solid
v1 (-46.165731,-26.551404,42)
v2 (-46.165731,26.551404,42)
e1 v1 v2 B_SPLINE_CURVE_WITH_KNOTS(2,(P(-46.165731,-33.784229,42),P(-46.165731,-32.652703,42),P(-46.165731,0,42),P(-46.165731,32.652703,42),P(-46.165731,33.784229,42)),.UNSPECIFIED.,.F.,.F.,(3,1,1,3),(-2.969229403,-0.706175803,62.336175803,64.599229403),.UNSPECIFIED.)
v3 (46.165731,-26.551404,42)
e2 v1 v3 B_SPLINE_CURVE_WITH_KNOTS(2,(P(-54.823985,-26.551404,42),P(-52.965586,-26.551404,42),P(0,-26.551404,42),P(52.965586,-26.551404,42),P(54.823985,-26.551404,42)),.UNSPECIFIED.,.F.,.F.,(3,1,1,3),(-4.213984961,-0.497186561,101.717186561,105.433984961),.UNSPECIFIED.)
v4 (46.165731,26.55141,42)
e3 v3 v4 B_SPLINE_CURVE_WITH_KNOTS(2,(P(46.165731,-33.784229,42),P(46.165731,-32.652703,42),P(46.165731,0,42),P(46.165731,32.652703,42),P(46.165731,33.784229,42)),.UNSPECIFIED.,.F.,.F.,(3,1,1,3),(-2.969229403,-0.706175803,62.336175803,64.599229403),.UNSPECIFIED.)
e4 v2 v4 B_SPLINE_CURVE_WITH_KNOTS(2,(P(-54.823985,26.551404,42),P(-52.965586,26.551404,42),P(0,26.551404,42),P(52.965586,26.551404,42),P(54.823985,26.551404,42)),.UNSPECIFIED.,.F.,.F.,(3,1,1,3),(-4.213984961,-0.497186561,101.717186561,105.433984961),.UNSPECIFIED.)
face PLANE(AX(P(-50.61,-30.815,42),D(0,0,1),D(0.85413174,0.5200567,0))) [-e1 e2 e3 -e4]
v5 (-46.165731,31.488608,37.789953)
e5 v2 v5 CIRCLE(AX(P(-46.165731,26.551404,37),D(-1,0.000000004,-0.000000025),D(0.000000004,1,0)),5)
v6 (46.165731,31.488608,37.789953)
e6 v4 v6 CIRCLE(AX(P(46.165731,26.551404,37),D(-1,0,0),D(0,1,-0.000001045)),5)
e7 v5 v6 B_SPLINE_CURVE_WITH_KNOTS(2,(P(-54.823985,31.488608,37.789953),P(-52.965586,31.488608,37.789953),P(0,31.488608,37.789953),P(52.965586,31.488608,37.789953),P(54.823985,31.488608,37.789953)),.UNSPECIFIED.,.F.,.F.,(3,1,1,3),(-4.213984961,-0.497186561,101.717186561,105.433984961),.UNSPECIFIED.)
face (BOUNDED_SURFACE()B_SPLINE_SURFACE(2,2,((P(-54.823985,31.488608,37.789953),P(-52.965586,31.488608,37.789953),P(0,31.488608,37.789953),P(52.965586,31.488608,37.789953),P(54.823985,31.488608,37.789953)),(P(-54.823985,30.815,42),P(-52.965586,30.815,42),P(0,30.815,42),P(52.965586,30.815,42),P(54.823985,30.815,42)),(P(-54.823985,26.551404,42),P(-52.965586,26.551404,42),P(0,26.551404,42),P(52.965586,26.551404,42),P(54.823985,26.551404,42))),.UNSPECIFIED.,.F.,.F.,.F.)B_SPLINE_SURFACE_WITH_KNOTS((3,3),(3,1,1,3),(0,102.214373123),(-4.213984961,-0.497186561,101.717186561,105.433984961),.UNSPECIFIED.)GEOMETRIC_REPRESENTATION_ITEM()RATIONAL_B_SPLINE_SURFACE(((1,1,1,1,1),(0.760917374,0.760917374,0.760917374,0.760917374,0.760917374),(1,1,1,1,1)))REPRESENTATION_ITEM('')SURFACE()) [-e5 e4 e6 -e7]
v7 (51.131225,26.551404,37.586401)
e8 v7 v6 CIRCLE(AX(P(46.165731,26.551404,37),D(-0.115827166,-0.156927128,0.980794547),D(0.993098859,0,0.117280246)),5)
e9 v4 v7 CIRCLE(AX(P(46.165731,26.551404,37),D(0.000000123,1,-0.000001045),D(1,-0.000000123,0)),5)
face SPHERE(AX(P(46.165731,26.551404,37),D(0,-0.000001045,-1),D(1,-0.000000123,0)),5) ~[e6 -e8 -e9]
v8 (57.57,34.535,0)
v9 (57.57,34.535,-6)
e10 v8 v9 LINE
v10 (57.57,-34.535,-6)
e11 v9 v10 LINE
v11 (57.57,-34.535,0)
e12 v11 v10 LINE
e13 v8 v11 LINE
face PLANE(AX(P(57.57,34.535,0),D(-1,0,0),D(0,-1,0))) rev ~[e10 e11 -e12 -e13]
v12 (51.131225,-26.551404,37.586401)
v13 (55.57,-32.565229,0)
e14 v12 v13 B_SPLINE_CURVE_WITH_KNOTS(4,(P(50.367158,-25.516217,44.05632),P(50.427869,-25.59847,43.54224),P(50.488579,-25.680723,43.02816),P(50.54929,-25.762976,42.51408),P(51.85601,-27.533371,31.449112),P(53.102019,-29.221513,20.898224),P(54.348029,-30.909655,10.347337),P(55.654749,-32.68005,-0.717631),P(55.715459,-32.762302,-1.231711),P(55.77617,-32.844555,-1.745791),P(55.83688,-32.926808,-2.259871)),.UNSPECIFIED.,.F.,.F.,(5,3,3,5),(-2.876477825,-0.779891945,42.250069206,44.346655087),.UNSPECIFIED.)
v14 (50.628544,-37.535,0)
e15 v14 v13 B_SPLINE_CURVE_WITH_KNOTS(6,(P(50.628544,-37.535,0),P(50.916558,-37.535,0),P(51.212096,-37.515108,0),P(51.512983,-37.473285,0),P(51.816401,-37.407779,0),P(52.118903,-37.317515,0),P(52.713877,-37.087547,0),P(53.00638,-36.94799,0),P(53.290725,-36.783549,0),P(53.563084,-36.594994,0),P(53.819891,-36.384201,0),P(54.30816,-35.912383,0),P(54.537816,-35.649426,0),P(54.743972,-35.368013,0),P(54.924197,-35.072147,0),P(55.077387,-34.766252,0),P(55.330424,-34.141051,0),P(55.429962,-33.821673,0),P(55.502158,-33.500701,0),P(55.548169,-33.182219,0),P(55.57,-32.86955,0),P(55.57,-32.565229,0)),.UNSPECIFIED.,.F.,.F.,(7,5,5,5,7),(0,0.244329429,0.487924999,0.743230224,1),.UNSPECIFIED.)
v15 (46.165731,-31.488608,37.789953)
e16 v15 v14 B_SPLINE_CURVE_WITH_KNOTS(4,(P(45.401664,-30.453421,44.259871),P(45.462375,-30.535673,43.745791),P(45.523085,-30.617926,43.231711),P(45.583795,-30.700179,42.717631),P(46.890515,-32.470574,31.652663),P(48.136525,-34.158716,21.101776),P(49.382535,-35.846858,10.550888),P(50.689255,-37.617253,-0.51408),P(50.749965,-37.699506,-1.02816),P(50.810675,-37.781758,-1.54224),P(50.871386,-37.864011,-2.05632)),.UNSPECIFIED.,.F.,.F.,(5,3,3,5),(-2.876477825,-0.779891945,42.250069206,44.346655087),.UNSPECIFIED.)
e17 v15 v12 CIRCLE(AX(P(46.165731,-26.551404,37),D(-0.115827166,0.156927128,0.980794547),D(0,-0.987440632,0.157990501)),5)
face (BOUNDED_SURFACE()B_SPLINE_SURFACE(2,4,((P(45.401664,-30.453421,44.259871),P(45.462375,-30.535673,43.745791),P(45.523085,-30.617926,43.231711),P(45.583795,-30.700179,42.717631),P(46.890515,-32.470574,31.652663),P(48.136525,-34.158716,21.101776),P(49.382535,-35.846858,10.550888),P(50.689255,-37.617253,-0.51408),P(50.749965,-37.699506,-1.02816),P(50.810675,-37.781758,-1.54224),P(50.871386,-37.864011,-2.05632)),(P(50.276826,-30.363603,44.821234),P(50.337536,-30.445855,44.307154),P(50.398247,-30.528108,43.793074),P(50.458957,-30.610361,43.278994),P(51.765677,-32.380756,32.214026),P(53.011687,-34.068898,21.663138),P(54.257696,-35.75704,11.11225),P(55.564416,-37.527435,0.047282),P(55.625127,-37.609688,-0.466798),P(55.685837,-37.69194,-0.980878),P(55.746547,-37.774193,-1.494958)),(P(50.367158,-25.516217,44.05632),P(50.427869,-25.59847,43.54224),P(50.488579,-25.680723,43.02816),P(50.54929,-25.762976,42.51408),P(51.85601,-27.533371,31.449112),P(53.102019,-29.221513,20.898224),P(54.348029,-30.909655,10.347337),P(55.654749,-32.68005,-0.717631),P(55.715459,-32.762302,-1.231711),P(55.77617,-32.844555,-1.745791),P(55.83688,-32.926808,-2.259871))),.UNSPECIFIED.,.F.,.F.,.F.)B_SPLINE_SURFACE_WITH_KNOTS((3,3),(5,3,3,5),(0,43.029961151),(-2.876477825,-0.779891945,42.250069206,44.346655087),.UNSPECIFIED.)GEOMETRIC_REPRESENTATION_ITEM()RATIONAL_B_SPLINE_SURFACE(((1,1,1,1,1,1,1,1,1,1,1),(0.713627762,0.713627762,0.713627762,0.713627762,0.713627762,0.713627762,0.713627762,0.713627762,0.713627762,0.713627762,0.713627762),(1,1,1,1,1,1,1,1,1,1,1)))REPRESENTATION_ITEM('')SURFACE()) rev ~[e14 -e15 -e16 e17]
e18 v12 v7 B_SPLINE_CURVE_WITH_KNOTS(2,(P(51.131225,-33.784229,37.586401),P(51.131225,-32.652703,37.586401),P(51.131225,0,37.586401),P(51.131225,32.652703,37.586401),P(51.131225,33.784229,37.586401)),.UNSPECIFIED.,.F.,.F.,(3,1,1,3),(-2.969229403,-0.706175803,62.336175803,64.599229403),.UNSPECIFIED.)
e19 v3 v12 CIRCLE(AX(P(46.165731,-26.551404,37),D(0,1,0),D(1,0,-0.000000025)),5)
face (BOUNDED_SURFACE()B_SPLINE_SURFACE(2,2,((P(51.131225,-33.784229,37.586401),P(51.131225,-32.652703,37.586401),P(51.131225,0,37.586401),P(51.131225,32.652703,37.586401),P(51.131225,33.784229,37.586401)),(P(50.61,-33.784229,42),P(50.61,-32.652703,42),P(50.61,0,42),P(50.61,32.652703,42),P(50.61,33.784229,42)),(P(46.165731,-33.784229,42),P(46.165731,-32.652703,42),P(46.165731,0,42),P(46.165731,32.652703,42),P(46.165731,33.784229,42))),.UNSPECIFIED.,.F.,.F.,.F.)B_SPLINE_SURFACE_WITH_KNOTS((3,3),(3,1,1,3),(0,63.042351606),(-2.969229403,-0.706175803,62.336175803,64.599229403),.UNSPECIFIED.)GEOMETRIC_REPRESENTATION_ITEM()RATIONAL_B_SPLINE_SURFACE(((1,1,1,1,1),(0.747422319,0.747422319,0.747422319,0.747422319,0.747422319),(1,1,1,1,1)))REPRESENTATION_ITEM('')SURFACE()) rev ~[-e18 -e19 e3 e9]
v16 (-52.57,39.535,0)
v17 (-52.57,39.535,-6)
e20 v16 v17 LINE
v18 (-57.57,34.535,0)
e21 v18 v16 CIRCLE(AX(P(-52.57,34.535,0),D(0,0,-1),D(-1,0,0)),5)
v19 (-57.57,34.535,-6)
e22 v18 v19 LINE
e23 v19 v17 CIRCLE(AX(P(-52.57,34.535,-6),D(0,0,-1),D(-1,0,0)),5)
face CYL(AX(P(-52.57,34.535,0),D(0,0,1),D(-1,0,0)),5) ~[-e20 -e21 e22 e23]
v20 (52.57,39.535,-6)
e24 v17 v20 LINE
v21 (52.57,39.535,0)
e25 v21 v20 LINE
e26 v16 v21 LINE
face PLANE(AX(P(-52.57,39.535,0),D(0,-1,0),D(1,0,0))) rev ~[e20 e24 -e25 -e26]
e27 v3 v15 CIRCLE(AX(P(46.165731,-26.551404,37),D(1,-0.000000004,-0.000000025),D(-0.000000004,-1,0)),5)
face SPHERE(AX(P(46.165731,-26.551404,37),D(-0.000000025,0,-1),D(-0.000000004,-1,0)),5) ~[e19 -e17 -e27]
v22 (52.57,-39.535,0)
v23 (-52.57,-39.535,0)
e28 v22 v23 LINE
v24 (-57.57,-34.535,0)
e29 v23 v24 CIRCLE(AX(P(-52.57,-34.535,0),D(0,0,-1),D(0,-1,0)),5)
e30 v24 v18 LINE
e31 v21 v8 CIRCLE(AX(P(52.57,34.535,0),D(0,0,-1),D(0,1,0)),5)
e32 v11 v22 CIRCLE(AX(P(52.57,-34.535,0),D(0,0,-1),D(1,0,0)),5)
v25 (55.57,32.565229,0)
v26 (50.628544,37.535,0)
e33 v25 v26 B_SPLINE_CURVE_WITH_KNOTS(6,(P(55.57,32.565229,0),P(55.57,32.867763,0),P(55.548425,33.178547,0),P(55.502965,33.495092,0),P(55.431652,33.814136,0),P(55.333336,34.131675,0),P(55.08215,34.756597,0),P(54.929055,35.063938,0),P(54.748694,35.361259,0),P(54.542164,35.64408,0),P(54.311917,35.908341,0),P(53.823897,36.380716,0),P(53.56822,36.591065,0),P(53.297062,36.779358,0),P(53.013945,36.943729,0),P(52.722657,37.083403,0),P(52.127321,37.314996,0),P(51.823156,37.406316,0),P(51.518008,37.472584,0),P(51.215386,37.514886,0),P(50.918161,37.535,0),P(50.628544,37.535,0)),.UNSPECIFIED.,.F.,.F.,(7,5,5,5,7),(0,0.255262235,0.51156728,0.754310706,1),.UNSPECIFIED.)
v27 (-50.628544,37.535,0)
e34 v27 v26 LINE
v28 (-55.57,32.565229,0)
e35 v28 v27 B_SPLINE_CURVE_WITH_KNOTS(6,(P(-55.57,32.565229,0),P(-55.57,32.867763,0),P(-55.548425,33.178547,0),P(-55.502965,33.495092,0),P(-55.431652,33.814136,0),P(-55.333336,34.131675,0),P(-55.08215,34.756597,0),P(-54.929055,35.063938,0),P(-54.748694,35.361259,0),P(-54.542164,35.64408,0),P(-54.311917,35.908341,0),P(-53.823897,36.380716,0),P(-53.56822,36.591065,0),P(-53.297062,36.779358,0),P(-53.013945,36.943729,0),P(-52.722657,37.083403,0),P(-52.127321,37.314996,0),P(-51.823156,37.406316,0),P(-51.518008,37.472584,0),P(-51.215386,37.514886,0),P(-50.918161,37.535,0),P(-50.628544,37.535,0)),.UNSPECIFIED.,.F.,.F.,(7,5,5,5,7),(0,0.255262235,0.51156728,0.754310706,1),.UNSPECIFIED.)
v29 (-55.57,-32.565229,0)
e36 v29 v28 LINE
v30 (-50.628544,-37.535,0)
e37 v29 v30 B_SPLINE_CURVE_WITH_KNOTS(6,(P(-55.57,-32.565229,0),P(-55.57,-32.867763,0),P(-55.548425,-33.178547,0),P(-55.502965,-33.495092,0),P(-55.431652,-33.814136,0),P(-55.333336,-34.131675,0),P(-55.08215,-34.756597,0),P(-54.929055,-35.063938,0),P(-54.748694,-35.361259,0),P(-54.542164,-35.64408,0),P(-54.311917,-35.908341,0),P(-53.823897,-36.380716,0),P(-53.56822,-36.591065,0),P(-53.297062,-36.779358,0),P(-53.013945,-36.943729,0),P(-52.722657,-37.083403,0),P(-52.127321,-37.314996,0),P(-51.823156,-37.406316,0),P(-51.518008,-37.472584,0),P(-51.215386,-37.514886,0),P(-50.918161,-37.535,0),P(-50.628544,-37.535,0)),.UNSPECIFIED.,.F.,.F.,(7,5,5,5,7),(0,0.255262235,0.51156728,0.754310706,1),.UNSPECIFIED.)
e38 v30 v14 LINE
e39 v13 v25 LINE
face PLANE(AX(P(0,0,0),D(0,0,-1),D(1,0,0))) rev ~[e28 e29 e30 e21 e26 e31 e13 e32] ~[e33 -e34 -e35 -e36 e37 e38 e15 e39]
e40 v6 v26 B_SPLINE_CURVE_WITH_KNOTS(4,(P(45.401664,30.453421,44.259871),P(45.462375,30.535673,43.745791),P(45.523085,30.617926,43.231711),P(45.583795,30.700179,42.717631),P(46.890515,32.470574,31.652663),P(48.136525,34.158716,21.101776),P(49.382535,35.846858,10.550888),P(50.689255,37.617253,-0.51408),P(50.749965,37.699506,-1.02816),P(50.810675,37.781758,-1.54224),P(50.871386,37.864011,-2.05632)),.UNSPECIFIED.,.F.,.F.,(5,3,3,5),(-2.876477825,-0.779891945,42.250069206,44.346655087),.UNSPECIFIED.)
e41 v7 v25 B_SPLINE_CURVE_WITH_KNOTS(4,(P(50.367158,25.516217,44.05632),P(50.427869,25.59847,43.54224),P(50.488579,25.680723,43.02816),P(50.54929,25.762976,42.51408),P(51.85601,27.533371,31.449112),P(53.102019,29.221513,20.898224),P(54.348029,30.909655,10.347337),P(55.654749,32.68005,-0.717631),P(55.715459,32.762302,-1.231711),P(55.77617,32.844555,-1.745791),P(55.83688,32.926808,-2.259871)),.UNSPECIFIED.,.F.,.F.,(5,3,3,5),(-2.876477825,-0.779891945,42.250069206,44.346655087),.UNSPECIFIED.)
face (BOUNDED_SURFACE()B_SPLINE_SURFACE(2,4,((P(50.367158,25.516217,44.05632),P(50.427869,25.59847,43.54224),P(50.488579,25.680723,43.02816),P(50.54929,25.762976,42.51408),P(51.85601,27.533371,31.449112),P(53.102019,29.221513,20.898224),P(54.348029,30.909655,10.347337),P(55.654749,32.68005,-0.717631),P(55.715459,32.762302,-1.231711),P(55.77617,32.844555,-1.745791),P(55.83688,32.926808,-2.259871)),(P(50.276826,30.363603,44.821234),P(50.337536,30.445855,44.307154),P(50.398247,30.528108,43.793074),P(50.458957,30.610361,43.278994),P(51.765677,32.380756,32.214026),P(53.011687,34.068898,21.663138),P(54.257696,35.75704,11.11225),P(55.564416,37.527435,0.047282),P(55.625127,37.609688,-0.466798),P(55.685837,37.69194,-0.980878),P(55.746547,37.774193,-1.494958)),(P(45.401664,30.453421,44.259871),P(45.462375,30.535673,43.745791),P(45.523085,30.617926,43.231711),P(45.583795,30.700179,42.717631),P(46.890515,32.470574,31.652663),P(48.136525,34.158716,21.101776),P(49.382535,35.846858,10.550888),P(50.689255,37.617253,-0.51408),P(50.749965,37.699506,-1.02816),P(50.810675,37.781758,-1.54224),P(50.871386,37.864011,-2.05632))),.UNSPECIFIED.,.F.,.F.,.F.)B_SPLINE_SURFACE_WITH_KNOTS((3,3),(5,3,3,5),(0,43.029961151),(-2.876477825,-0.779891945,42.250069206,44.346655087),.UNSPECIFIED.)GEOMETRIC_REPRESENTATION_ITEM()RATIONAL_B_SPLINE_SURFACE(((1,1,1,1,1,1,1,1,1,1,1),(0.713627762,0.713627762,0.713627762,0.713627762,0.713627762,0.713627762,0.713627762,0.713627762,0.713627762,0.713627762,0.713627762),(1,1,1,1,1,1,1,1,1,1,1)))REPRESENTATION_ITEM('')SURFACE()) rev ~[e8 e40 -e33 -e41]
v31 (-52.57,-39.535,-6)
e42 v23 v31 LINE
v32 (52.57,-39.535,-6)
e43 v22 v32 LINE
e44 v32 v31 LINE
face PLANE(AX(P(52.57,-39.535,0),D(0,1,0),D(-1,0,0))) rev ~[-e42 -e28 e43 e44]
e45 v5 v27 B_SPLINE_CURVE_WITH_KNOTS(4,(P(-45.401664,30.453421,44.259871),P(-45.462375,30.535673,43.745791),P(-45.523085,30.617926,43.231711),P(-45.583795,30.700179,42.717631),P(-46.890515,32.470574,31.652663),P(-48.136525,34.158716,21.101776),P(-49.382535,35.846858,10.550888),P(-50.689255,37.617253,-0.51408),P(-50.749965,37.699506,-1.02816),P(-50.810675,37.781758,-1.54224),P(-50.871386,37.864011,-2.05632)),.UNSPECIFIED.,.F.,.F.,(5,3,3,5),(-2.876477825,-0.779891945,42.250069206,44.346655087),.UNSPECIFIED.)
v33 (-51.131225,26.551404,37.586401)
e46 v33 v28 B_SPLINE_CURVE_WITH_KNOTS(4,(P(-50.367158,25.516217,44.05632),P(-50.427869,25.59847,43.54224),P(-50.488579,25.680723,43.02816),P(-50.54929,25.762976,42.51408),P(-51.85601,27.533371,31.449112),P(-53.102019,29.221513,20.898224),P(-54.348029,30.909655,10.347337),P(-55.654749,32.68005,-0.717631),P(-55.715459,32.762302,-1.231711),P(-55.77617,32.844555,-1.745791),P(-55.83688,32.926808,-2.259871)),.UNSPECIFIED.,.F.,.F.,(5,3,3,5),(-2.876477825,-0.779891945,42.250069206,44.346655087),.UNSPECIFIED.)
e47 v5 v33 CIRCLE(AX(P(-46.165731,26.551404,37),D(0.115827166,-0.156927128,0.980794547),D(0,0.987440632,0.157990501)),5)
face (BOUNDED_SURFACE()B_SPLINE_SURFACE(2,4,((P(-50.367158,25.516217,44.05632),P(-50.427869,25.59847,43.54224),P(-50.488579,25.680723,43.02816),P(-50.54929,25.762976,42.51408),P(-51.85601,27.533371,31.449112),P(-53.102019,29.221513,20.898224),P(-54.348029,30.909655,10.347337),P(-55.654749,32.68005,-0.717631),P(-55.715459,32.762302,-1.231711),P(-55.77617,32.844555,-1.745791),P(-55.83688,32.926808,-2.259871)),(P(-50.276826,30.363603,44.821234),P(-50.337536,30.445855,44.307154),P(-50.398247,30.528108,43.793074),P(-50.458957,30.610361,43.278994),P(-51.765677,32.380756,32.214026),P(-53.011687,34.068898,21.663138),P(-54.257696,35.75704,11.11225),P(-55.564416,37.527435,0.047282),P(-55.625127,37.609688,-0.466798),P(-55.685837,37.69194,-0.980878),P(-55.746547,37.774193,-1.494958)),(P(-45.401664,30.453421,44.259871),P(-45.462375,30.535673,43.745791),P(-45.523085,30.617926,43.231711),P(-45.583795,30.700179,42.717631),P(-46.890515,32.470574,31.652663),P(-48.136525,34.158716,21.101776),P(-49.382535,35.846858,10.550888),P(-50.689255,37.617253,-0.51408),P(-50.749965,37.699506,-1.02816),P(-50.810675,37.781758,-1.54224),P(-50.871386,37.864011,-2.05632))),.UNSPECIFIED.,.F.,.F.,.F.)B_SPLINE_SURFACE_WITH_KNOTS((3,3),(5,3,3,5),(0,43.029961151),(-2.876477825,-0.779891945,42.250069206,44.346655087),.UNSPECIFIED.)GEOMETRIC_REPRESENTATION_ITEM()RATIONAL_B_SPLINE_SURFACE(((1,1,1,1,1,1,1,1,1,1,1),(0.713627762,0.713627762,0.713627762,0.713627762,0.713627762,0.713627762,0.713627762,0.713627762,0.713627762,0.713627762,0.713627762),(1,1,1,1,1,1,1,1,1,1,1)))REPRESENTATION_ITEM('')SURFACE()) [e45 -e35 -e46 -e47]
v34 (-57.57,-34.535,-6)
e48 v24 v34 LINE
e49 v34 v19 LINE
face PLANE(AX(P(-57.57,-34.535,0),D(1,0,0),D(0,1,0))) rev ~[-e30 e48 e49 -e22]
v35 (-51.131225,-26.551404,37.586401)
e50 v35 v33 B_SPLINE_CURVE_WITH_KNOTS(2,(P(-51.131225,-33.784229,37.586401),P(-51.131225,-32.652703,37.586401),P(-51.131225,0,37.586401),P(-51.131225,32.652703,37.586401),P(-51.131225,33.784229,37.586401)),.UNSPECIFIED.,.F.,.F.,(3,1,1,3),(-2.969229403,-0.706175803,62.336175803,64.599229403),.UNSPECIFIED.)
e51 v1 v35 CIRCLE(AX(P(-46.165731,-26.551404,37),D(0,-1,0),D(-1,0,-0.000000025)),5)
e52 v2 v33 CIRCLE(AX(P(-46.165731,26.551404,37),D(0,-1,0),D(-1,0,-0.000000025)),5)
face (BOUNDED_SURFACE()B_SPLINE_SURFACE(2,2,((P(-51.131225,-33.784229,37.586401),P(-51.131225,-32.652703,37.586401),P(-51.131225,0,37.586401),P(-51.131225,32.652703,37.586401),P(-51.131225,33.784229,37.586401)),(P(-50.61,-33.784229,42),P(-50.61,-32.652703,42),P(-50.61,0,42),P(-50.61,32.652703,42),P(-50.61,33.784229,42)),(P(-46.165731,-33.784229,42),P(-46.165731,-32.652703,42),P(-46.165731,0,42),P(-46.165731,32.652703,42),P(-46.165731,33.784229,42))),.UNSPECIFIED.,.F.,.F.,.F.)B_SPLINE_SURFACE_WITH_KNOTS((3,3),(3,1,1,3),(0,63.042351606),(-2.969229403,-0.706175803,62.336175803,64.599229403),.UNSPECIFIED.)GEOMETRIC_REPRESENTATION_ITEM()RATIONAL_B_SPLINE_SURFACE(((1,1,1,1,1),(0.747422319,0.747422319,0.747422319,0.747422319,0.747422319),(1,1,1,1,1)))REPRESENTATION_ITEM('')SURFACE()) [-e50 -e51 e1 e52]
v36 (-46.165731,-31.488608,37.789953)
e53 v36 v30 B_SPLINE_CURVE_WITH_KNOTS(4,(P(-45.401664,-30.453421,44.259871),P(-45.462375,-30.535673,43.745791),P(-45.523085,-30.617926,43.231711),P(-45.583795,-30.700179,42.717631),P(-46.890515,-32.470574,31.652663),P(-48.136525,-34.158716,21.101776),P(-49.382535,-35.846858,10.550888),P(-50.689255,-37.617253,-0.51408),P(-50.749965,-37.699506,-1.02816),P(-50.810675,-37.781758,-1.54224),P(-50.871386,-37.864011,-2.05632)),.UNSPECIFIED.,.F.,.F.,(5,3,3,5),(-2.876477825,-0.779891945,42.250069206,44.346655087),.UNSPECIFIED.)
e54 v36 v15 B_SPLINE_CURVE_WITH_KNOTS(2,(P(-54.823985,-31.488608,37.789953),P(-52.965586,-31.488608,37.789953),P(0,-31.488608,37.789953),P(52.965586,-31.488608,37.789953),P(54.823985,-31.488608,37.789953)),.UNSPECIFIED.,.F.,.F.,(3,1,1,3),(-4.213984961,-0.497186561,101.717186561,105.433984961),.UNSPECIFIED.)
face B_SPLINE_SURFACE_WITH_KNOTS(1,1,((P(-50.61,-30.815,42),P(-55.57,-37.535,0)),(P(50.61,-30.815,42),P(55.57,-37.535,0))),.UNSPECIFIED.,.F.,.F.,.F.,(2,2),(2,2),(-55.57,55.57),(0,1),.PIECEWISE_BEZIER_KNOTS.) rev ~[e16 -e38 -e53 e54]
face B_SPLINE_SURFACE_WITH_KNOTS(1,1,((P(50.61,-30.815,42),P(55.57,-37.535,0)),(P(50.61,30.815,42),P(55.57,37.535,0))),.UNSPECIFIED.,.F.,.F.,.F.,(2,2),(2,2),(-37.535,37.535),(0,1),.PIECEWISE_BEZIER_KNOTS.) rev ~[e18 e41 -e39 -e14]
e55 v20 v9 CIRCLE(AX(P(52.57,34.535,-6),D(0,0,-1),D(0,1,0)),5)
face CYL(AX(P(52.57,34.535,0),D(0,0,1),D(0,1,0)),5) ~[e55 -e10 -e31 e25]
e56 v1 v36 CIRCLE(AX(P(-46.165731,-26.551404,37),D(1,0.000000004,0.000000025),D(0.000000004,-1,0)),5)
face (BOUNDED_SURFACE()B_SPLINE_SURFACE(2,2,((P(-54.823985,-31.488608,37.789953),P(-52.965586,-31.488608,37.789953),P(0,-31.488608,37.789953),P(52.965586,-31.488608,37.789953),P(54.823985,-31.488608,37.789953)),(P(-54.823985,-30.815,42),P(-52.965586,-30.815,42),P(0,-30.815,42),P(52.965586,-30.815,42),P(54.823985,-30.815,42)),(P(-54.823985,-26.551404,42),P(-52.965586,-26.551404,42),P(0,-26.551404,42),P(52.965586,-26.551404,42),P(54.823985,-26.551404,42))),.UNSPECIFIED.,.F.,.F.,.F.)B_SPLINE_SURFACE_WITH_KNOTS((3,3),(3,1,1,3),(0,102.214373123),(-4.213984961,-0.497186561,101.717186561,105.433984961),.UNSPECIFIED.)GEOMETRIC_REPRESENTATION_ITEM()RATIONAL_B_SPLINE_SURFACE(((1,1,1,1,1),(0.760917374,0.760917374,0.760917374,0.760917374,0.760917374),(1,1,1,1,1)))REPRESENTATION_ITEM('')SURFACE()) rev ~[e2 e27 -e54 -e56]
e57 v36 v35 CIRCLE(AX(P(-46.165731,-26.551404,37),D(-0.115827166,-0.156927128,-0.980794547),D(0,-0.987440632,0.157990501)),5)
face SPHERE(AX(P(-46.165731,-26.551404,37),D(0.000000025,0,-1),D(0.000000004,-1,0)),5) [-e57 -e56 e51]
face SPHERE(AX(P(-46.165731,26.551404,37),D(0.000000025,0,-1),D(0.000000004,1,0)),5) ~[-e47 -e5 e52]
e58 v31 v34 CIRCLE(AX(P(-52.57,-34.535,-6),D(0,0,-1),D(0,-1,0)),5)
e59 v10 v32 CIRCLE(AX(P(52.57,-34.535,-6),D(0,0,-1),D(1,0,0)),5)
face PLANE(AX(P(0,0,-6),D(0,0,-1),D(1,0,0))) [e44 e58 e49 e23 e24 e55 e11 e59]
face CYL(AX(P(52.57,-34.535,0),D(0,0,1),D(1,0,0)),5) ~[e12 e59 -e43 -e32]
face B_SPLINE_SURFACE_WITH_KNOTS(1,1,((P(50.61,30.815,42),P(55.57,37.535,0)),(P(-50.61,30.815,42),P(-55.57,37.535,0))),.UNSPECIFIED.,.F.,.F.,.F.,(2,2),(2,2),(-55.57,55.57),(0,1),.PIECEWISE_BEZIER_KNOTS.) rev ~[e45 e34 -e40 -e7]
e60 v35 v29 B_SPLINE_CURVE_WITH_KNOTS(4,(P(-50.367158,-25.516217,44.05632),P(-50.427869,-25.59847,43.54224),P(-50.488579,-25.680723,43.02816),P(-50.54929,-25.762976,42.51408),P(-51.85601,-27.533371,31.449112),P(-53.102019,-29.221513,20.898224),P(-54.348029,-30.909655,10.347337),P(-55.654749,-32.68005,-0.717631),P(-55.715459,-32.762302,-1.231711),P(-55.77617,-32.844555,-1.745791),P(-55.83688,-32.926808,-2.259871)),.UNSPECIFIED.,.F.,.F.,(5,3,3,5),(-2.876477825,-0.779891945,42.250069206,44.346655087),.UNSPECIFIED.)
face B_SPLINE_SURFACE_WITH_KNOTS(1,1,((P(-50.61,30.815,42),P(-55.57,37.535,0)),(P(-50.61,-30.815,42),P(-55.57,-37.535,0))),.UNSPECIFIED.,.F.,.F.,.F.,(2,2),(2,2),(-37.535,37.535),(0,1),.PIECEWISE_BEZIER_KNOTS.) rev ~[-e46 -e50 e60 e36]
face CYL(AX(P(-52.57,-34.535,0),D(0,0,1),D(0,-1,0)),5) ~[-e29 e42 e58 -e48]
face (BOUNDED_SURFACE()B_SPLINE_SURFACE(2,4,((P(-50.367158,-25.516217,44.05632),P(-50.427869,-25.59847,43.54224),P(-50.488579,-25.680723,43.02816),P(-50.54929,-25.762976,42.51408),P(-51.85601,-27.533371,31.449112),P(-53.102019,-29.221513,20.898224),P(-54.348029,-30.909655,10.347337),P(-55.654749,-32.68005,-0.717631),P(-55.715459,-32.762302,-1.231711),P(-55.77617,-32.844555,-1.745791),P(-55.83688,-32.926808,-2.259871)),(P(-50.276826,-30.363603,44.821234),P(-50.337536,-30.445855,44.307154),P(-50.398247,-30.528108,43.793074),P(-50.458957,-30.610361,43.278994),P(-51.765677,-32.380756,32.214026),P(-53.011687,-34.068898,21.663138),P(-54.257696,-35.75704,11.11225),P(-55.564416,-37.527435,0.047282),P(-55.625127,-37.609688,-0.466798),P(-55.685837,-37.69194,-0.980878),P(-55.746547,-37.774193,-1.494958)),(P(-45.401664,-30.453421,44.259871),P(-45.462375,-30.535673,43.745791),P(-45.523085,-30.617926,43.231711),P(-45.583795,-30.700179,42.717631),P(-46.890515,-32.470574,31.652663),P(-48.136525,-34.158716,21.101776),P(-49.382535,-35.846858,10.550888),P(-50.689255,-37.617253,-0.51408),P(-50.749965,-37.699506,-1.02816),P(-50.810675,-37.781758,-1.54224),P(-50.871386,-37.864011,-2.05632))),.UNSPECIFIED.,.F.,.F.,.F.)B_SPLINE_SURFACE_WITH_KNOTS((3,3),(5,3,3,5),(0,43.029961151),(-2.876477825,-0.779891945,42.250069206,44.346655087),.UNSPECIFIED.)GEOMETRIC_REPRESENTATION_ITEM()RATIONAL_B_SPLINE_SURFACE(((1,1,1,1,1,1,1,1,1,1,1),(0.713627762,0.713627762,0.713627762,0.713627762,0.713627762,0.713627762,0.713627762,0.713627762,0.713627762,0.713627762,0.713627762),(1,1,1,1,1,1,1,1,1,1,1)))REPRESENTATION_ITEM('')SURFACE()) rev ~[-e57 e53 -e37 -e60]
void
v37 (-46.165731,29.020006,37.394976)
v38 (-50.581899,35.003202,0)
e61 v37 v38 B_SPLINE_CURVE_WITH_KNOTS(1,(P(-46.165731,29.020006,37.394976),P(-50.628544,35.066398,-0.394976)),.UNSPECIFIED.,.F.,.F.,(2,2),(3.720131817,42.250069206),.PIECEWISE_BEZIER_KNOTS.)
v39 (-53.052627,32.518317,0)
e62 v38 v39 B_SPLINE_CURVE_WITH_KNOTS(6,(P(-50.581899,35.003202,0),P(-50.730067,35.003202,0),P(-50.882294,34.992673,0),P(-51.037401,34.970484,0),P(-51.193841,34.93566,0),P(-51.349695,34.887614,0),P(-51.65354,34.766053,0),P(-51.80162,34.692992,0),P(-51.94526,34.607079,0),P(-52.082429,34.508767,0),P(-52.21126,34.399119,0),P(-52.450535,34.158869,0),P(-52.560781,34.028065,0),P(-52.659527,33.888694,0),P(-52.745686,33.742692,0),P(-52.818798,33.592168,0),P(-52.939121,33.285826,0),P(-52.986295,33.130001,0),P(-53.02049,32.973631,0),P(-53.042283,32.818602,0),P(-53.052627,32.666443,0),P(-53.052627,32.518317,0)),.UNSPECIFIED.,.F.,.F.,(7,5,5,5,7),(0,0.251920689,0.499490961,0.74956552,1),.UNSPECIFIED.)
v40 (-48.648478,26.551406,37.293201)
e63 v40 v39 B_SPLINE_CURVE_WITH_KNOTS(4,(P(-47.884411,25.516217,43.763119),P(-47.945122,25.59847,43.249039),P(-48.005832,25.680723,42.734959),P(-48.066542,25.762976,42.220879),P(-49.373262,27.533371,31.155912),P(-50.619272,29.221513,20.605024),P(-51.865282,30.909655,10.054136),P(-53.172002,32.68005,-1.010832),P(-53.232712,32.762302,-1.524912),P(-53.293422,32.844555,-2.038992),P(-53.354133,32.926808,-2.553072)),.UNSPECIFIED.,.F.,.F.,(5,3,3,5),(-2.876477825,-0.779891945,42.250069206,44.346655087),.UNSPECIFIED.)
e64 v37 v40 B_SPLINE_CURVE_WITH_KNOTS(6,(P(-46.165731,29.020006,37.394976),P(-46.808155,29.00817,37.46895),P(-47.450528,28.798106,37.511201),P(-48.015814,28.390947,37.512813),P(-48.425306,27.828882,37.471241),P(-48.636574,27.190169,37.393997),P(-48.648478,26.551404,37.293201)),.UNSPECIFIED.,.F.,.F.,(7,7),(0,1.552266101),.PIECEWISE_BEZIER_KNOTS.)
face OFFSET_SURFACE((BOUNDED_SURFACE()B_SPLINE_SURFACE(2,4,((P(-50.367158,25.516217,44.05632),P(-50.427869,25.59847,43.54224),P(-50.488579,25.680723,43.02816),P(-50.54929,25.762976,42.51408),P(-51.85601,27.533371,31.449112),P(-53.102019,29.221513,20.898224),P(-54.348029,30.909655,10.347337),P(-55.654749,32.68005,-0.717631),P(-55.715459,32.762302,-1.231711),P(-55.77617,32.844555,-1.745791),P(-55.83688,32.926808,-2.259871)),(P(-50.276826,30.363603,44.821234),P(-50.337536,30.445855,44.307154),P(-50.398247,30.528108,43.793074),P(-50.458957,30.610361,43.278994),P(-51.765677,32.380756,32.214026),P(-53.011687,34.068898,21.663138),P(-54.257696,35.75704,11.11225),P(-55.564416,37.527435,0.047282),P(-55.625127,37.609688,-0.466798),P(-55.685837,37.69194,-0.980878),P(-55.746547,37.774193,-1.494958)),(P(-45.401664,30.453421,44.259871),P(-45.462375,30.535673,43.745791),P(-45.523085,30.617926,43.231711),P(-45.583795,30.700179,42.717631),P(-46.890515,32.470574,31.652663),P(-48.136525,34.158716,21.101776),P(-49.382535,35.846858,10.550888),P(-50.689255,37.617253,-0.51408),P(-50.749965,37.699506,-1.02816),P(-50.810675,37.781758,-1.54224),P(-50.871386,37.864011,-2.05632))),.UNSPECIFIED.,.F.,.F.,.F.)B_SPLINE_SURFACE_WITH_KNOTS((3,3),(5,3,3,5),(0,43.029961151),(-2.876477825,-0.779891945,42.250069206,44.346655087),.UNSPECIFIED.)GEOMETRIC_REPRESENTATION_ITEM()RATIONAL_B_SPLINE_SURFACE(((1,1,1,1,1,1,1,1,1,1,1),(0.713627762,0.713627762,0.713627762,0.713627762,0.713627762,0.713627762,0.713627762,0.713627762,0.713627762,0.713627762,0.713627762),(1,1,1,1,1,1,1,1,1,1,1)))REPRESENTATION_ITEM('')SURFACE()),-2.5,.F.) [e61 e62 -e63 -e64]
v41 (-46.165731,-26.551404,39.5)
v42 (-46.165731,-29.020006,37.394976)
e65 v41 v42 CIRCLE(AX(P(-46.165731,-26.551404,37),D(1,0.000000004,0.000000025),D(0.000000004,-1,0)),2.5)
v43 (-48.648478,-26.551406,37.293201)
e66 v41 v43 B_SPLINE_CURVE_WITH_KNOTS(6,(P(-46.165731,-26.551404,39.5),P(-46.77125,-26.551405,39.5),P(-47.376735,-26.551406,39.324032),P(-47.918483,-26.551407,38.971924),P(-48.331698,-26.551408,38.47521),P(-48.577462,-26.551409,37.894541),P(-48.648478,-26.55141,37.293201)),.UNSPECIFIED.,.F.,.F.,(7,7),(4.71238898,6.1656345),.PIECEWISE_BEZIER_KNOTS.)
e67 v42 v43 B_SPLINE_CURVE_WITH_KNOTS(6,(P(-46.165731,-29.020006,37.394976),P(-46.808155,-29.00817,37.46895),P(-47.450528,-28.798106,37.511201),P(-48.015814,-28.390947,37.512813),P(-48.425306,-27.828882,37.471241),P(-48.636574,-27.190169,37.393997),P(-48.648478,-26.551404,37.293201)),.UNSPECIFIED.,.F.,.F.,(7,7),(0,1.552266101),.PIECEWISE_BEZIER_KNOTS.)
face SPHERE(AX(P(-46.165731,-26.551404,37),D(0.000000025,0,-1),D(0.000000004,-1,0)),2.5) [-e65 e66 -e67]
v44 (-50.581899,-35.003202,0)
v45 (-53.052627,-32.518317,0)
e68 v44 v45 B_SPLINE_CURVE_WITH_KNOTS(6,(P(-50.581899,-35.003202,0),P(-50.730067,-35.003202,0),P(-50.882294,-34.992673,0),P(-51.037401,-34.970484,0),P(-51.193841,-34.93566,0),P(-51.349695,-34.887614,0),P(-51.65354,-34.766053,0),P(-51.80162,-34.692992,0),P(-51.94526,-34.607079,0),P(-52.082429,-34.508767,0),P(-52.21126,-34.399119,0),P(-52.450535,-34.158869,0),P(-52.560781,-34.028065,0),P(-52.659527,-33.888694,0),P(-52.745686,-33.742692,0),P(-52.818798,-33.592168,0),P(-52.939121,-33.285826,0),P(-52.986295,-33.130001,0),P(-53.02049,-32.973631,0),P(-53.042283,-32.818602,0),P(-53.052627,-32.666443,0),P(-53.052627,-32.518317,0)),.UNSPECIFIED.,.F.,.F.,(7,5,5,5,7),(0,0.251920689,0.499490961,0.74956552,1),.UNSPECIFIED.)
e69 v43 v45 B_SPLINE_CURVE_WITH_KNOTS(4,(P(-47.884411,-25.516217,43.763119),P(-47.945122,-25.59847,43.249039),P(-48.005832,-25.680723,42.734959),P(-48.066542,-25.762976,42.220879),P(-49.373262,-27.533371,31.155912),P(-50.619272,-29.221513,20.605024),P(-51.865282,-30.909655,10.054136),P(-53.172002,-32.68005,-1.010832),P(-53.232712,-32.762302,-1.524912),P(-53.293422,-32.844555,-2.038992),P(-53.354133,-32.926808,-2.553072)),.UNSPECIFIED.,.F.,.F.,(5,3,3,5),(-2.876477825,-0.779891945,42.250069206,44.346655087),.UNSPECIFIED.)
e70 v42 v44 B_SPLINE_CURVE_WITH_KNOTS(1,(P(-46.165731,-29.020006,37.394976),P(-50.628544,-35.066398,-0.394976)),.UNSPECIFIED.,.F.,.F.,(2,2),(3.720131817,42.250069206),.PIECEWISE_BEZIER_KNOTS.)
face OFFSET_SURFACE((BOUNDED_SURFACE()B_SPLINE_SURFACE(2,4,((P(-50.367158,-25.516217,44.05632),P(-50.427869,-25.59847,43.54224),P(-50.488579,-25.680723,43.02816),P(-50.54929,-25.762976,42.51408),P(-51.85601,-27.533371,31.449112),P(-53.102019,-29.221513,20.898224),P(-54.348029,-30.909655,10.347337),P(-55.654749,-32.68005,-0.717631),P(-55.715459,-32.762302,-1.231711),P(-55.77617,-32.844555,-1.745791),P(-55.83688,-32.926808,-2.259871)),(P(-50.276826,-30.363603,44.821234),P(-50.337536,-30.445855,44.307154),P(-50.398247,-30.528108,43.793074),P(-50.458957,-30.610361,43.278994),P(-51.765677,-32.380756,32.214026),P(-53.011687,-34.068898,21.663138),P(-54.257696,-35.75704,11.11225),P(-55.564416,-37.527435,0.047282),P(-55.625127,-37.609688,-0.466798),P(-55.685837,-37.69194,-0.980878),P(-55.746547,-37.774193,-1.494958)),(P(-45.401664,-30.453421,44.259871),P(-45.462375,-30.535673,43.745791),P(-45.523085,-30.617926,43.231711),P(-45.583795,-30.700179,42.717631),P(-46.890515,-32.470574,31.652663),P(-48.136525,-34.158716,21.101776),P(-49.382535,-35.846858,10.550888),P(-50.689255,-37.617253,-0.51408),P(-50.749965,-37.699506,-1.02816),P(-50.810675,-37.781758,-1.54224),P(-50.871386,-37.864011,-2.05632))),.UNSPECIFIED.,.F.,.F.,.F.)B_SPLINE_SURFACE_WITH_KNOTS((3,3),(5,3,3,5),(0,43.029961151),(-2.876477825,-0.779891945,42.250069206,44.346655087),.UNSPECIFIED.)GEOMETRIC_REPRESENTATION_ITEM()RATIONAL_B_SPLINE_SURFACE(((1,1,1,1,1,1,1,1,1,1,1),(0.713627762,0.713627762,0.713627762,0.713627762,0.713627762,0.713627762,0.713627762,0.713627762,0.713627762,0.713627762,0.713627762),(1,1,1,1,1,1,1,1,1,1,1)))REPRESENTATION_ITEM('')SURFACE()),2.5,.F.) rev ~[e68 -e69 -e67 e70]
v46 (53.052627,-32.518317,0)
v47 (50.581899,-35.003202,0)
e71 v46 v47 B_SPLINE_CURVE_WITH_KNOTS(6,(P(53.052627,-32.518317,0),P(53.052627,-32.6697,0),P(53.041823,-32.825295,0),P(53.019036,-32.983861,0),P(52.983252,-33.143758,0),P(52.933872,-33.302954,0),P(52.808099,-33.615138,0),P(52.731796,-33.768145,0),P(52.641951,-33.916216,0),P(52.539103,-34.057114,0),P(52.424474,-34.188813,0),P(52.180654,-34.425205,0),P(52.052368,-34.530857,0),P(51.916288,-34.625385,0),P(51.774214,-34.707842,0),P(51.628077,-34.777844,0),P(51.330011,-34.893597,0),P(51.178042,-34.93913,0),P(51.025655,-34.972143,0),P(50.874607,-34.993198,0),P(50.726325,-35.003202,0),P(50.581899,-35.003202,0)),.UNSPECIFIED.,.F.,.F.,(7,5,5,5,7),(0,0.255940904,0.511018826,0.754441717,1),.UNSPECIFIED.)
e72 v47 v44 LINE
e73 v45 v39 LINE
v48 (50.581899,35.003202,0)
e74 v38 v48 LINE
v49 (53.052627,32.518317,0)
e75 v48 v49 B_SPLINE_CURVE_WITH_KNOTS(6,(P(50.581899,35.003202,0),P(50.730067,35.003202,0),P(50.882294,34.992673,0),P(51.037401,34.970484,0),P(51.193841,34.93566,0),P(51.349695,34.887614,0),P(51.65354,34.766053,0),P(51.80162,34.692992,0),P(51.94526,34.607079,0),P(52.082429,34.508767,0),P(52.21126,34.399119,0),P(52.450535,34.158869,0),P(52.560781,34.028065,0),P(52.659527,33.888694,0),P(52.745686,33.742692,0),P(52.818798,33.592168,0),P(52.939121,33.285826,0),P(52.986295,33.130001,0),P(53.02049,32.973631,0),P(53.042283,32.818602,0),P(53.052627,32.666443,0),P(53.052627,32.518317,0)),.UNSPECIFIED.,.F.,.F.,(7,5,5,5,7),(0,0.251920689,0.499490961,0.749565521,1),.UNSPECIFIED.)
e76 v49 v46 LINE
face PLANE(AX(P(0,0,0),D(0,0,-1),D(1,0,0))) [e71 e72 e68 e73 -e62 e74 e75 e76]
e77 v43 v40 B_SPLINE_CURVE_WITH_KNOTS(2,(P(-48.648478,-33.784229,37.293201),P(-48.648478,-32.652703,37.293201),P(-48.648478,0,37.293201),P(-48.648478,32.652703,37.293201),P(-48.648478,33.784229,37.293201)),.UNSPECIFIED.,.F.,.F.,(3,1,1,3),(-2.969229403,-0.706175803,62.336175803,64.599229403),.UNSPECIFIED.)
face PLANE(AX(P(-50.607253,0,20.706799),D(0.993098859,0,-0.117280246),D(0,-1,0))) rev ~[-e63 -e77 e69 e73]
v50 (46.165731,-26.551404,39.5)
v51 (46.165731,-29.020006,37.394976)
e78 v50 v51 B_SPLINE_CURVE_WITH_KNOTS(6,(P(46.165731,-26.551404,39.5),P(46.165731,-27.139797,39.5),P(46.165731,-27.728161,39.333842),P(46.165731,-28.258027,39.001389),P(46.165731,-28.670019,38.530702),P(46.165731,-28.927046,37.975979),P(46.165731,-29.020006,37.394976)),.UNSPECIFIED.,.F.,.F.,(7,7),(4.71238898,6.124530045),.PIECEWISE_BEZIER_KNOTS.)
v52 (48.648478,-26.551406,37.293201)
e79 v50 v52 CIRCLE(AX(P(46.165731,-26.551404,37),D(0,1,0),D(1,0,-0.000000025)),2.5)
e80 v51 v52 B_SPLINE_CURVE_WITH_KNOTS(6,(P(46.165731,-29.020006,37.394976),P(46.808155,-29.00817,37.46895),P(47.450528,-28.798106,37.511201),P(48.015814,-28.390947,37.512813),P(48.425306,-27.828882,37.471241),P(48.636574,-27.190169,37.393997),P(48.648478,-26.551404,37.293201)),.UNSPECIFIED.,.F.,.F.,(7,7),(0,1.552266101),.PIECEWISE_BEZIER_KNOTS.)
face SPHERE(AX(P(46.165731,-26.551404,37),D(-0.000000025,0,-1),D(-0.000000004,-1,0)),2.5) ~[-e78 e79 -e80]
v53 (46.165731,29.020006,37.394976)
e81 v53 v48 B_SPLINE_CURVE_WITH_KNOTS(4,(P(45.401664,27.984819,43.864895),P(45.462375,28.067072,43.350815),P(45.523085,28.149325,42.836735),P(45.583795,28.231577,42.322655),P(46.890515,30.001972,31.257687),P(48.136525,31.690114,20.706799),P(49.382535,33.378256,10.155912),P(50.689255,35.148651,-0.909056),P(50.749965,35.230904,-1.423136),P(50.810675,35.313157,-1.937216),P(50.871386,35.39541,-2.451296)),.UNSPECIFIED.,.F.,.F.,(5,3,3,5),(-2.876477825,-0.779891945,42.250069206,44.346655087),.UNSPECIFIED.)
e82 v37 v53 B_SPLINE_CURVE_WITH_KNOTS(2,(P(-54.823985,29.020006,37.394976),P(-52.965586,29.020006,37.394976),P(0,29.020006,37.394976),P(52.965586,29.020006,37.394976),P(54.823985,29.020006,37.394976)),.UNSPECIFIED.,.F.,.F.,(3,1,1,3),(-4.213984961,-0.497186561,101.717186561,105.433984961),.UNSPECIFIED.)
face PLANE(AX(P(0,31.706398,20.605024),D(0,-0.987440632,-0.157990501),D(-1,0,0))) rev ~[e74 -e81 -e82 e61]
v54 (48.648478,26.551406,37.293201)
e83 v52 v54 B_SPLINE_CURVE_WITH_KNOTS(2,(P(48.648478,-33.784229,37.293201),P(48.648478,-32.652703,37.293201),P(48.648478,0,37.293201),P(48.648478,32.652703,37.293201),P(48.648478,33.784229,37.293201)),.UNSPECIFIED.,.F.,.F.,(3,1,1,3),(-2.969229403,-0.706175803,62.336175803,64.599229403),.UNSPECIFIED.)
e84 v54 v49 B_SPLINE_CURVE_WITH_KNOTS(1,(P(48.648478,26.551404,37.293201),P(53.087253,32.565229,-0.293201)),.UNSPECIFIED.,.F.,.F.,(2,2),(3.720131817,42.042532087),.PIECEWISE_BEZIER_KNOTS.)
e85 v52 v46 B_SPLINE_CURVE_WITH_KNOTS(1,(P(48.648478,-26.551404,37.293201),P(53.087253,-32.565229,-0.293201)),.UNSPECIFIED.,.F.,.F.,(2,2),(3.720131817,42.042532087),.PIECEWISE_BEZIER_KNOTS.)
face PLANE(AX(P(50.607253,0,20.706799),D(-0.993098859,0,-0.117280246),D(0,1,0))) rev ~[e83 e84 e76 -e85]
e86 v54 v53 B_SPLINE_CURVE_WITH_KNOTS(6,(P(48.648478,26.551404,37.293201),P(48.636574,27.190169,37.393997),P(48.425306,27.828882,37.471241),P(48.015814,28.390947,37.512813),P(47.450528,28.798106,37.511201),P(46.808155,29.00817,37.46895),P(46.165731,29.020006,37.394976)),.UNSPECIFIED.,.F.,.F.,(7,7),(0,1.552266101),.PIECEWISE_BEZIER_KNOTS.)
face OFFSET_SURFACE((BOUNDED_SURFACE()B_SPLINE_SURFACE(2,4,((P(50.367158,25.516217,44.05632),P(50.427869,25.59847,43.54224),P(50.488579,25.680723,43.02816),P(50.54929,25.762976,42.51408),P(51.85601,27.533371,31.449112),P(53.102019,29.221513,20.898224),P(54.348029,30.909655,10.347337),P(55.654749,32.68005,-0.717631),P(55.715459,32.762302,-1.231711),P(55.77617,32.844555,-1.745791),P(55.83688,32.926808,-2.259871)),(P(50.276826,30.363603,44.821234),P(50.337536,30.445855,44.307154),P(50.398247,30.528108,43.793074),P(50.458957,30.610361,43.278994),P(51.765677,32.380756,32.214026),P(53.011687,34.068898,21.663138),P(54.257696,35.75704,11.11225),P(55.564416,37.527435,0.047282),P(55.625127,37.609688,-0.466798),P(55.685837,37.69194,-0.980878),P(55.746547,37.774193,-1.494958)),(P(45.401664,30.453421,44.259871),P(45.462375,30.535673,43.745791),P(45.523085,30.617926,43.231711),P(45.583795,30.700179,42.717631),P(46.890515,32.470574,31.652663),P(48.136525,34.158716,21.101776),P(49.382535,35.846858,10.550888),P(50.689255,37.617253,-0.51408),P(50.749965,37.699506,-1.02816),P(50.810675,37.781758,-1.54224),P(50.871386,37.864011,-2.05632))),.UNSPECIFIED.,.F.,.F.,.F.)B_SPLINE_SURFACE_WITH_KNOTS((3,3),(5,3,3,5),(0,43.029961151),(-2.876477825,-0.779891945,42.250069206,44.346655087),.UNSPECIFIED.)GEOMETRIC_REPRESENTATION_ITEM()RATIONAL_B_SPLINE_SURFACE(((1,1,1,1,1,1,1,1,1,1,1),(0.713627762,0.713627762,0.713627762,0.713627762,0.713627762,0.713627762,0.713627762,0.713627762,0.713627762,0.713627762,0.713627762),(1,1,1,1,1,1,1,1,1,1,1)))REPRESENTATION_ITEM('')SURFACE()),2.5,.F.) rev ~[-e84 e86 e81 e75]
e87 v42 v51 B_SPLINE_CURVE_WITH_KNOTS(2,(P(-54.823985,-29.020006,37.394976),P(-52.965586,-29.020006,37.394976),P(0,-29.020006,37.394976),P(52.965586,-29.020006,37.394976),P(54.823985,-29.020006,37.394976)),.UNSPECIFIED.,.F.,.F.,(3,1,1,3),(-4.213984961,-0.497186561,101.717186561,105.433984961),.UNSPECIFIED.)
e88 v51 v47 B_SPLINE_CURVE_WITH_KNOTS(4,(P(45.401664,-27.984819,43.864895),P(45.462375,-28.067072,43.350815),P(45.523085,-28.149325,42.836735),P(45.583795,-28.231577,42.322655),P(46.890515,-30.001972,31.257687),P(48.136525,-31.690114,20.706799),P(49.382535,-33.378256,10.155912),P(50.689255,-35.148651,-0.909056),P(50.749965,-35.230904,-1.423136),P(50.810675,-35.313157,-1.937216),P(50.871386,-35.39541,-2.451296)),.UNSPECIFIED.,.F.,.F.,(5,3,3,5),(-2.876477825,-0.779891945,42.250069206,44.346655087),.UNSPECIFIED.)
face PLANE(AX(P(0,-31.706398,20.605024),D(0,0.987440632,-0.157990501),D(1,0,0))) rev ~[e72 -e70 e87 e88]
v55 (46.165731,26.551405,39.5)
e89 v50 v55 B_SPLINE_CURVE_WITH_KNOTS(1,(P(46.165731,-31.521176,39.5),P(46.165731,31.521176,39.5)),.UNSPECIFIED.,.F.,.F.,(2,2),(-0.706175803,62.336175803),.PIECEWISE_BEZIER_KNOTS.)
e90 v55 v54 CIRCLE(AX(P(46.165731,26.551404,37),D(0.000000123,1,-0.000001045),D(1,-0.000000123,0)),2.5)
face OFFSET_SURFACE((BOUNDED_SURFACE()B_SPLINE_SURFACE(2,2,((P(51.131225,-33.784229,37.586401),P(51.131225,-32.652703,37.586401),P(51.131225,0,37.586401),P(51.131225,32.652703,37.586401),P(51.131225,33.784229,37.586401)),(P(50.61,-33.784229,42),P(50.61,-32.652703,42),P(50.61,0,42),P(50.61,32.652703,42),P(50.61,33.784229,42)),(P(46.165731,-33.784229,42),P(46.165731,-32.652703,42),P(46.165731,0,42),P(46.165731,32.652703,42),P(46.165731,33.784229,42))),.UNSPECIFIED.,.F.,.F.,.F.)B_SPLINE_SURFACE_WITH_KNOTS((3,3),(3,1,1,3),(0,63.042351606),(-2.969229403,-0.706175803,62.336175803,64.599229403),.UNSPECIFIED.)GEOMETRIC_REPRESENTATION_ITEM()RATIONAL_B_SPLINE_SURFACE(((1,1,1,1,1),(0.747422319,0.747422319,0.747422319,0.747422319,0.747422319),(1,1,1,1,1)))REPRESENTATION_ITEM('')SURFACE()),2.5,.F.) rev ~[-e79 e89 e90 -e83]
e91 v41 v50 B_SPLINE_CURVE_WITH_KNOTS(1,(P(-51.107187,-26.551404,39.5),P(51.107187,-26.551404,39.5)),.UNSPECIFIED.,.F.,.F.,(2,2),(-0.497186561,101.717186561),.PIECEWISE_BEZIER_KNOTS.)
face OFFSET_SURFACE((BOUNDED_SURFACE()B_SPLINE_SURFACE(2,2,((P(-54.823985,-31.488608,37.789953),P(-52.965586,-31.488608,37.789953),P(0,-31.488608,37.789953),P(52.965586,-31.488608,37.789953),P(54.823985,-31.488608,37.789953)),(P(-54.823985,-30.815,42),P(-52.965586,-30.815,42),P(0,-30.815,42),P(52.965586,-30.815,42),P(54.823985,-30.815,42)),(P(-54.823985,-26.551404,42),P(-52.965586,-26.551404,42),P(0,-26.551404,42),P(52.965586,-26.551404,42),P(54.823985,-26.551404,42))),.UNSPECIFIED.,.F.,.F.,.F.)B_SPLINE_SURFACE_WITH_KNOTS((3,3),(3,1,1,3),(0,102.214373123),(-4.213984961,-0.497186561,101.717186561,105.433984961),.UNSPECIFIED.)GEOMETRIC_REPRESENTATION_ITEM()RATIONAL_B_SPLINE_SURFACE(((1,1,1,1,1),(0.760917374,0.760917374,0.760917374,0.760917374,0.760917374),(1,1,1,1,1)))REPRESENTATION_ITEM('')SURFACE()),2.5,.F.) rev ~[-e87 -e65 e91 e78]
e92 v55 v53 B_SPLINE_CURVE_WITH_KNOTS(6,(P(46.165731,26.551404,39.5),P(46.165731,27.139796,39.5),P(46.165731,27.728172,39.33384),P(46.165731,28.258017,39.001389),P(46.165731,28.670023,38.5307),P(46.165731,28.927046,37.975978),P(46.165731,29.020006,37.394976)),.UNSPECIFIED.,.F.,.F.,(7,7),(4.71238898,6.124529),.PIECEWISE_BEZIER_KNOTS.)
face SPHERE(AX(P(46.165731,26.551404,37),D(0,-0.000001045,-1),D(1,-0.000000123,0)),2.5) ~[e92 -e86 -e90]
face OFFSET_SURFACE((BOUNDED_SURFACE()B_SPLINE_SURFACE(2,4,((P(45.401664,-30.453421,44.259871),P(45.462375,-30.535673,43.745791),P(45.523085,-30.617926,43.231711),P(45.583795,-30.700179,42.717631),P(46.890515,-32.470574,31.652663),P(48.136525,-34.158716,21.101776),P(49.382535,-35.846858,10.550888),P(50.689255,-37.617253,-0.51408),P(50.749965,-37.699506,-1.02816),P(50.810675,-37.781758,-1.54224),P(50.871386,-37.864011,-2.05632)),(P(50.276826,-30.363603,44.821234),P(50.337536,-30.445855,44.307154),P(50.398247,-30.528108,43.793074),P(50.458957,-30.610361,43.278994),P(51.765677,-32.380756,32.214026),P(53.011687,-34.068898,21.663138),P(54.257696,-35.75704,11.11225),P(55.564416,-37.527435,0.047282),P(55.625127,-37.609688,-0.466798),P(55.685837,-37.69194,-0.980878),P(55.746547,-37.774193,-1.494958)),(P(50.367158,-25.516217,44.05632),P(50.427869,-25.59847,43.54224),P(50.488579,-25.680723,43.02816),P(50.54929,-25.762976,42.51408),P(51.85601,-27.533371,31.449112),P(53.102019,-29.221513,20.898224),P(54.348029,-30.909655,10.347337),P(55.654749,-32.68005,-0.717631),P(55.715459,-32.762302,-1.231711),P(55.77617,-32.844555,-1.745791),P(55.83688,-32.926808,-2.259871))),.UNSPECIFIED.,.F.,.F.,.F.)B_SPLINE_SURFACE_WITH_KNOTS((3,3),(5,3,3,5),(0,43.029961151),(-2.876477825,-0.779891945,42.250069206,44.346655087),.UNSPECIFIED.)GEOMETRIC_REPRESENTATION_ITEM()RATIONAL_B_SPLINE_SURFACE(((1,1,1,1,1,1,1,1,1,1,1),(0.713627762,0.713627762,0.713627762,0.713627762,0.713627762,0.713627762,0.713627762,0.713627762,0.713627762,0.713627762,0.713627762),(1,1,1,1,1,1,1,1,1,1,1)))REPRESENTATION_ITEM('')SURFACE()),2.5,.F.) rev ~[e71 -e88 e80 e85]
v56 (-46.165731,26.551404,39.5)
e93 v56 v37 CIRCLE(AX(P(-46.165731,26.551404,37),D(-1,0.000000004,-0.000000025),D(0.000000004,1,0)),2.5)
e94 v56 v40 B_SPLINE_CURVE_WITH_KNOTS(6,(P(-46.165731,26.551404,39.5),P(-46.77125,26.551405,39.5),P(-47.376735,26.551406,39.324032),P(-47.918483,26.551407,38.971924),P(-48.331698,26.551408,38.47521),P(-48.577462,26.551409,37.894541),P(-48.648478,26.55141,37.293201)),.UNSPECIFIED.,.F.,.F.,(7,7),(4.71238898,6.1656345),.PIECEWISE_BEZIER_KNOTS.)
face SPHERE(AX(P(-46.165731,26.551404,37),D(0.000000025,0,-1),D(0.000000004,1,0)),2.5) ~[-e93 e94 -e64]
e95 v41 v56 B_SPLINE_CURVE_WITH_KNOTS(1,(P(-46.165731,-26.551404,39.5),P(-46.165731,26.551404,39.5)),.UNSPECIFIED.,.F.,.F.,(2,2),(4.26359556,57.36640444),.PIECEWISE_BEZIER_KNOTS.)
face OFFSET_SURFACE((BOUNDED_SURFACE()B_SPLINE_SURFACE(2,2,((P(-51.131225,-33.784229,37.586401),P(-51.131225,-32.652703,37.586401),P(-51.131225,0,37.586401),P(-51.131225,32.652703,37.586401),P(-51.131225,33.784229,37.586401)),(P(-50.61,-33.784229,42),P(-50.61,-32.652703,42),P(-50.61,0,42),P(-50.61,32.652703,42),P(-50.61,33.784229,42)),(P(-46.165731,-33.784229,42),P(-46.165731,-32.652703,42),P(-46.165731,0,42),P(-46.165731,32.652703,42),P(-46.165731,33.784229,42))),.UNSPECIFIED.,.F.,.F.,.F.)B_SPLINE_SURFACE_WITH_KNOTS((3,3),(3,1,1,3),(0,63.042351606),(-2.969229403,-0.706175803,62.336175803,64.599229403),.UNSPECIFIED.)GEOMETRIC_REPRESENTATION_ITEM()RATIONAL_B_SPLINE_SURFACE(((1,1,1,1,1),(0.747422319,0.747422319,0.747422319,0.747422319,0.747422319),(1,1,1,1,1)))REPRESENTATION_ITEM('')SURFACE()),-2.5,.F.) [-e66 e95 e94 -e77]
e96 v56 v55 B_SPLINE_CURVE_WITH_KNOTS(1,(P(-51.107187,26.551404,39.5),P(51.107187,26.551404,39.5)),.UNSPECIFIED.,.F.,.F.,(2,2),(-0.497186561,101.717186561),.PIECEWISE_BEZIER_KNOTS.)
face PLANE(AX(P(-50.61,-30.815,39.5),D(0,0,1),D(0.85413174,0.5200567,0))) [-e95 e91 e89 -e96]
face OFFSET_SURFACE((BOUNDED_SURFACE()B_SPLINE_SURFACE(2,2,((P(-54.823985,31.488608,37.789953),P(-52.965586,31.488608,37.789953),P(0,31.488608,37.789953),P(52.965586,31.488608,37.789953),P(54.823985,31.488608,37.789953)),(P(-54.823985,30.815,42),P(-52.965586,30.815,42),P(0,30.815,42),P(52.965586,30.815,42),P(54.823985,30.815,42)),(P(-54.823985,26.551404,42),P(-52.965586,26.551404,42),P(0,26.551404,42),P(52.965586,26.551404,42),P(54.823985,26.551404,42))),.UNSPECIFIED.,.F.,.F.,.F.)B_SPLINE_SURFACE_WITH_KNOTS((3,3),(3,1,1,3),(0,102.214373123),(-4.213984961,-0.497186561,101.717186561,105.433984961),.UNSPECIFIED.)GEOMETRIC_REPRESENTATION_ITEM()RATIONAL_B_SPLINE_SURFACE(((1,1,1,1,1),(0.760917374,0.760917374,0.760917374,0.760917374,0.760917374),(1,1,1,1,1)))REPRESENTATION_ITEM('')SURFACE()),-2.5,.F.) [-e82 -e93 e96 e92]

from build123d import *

# Parameters (mm, degrees)
F2_W     = 101.22
F2_H     = 61.63
F0_W     = 111.14
F0_H     = 75.07
F4_R     = 5
F5_T     = 2.5
F7_DEPTH = 6


# Not quite as in the source:
# - a shell that OpenCascade refuses in one call is made with other operations: the cavity is built on its own and cut out


with BuildPart() as f3:
    # F2 (on offset) → F3 section 0
    with BuildSketch(Plane.XY.offset(42)):
        Rectangle(F2_W, F2_H)
    # F0 (on Top) → F3 section 1
    with BuildSketch(Plane.XY):
        Rectangle(F0_W, F0_H)
    loft()

    # F4
    f4_edges = [f3.edges().sort_by_distance(p)[0] for p in [
        (-53.09, 34.175, 21),
        (53.09, 34.175, 21),
        (53.09, -34.175, 21),
        (-53.09, -34.175, 21),
        (0, -30.815, 42),
        (50.61, 0, 42),
        (0, 30.815, 42),
        (-50.61, 0, 42),
    ]]
    fillet(f4_edges, radius=F4_R)

    # F5: shell of thickness 2.5, made by hand


with BuildPart() as f5_core1:
    # F5_t2: copy of F3
    add(f3.part)

    # the walls: a layer under each face that stays
    f5_faces = [f5_core1.faces().sort_by_distance(p)[0] for p in [
        (-53.3506124987, 0, 18.7932006155),
        (-51.8873286605, 33.0489229278, 18.9750242391),
        (-51.8873286605, -33.0489229278, 18.9750242391),
        (-49.4874767675, 0, 40.7371115956),
        (0, 34.5118037996, 18.8949762528),
        (0, -34.5118037996, 18.8949762528),
        (51.8873286605, 33.0489229278, 18.9750242391),
        (51.8873299173, -33.0489246306, 18.9750135967),
        (53.3506124987, 0, 18.7932006155),
        (-48.5145599261, 28.9002335794, 40.7371115784),
        (-48.5145599261, -28.9002335794, 40.7371115784),
        (0, 0, 42),
        (0, 29.7956483786, 40.8045868716),
        (0, -29.7956483786, 40.8045868716),
        (48.5145600153, 28.9002373676, 40.7371091413),
        (48.5145599261, -28.9002335794, 40.7371115784),
        (49.4874767675, 0, 40.7371115956),
    ]]
    thicken(f5_faces, amount=-F5_T, mode=Mode.SUBTRACT)


with BuildPart() as f3_1:
    add(f3.part)

    # what is left inside the walls is the cavity
    f5_cavity = [f5_core1.part.solids().sort_by_distance(p)[0] for p in [
        (10.775811, 15.952675, 0.025),
    ]]
    add(f5_cavity, mode=Mode.SUBTRACT)

    # F6 (on face) → F7 (join)
    with BuildSketch(Plane(origin=(0, 0, 0), x_dir=(1, 0, 0), z_dir=(0, 0, -1))):
        with BuildLine():
            Line((52.57, 39.535), (-52.57, 39.535))
            ThreePointArc((-52.57, 39.535), (-56.1055339059, 38.0705339059), (-57.57, 34.535))
            Line((-57.57, 34.535), (-57.57, -34.535))
            ThreePointArc((-57.57, -34.535), (-56.1055339059, -38.0705339059), (-52.57, -39.535))
            Line((-52.57, -39.535), (52.57, -39.535))
            ThreePointArc((52.57, -39.535), (56.1055339059, -38.0705339059), (57.57, -34.535))
            Line((57.57, -34.535), (57.57, 34.535))
            ThreePointArc((57.57, 34.535), (56.1055339059, 38.0705339059), (52.57, 39.535))
        make_face()
    extrude(amount=F7_DEPTH)


solid = f3_1.part
